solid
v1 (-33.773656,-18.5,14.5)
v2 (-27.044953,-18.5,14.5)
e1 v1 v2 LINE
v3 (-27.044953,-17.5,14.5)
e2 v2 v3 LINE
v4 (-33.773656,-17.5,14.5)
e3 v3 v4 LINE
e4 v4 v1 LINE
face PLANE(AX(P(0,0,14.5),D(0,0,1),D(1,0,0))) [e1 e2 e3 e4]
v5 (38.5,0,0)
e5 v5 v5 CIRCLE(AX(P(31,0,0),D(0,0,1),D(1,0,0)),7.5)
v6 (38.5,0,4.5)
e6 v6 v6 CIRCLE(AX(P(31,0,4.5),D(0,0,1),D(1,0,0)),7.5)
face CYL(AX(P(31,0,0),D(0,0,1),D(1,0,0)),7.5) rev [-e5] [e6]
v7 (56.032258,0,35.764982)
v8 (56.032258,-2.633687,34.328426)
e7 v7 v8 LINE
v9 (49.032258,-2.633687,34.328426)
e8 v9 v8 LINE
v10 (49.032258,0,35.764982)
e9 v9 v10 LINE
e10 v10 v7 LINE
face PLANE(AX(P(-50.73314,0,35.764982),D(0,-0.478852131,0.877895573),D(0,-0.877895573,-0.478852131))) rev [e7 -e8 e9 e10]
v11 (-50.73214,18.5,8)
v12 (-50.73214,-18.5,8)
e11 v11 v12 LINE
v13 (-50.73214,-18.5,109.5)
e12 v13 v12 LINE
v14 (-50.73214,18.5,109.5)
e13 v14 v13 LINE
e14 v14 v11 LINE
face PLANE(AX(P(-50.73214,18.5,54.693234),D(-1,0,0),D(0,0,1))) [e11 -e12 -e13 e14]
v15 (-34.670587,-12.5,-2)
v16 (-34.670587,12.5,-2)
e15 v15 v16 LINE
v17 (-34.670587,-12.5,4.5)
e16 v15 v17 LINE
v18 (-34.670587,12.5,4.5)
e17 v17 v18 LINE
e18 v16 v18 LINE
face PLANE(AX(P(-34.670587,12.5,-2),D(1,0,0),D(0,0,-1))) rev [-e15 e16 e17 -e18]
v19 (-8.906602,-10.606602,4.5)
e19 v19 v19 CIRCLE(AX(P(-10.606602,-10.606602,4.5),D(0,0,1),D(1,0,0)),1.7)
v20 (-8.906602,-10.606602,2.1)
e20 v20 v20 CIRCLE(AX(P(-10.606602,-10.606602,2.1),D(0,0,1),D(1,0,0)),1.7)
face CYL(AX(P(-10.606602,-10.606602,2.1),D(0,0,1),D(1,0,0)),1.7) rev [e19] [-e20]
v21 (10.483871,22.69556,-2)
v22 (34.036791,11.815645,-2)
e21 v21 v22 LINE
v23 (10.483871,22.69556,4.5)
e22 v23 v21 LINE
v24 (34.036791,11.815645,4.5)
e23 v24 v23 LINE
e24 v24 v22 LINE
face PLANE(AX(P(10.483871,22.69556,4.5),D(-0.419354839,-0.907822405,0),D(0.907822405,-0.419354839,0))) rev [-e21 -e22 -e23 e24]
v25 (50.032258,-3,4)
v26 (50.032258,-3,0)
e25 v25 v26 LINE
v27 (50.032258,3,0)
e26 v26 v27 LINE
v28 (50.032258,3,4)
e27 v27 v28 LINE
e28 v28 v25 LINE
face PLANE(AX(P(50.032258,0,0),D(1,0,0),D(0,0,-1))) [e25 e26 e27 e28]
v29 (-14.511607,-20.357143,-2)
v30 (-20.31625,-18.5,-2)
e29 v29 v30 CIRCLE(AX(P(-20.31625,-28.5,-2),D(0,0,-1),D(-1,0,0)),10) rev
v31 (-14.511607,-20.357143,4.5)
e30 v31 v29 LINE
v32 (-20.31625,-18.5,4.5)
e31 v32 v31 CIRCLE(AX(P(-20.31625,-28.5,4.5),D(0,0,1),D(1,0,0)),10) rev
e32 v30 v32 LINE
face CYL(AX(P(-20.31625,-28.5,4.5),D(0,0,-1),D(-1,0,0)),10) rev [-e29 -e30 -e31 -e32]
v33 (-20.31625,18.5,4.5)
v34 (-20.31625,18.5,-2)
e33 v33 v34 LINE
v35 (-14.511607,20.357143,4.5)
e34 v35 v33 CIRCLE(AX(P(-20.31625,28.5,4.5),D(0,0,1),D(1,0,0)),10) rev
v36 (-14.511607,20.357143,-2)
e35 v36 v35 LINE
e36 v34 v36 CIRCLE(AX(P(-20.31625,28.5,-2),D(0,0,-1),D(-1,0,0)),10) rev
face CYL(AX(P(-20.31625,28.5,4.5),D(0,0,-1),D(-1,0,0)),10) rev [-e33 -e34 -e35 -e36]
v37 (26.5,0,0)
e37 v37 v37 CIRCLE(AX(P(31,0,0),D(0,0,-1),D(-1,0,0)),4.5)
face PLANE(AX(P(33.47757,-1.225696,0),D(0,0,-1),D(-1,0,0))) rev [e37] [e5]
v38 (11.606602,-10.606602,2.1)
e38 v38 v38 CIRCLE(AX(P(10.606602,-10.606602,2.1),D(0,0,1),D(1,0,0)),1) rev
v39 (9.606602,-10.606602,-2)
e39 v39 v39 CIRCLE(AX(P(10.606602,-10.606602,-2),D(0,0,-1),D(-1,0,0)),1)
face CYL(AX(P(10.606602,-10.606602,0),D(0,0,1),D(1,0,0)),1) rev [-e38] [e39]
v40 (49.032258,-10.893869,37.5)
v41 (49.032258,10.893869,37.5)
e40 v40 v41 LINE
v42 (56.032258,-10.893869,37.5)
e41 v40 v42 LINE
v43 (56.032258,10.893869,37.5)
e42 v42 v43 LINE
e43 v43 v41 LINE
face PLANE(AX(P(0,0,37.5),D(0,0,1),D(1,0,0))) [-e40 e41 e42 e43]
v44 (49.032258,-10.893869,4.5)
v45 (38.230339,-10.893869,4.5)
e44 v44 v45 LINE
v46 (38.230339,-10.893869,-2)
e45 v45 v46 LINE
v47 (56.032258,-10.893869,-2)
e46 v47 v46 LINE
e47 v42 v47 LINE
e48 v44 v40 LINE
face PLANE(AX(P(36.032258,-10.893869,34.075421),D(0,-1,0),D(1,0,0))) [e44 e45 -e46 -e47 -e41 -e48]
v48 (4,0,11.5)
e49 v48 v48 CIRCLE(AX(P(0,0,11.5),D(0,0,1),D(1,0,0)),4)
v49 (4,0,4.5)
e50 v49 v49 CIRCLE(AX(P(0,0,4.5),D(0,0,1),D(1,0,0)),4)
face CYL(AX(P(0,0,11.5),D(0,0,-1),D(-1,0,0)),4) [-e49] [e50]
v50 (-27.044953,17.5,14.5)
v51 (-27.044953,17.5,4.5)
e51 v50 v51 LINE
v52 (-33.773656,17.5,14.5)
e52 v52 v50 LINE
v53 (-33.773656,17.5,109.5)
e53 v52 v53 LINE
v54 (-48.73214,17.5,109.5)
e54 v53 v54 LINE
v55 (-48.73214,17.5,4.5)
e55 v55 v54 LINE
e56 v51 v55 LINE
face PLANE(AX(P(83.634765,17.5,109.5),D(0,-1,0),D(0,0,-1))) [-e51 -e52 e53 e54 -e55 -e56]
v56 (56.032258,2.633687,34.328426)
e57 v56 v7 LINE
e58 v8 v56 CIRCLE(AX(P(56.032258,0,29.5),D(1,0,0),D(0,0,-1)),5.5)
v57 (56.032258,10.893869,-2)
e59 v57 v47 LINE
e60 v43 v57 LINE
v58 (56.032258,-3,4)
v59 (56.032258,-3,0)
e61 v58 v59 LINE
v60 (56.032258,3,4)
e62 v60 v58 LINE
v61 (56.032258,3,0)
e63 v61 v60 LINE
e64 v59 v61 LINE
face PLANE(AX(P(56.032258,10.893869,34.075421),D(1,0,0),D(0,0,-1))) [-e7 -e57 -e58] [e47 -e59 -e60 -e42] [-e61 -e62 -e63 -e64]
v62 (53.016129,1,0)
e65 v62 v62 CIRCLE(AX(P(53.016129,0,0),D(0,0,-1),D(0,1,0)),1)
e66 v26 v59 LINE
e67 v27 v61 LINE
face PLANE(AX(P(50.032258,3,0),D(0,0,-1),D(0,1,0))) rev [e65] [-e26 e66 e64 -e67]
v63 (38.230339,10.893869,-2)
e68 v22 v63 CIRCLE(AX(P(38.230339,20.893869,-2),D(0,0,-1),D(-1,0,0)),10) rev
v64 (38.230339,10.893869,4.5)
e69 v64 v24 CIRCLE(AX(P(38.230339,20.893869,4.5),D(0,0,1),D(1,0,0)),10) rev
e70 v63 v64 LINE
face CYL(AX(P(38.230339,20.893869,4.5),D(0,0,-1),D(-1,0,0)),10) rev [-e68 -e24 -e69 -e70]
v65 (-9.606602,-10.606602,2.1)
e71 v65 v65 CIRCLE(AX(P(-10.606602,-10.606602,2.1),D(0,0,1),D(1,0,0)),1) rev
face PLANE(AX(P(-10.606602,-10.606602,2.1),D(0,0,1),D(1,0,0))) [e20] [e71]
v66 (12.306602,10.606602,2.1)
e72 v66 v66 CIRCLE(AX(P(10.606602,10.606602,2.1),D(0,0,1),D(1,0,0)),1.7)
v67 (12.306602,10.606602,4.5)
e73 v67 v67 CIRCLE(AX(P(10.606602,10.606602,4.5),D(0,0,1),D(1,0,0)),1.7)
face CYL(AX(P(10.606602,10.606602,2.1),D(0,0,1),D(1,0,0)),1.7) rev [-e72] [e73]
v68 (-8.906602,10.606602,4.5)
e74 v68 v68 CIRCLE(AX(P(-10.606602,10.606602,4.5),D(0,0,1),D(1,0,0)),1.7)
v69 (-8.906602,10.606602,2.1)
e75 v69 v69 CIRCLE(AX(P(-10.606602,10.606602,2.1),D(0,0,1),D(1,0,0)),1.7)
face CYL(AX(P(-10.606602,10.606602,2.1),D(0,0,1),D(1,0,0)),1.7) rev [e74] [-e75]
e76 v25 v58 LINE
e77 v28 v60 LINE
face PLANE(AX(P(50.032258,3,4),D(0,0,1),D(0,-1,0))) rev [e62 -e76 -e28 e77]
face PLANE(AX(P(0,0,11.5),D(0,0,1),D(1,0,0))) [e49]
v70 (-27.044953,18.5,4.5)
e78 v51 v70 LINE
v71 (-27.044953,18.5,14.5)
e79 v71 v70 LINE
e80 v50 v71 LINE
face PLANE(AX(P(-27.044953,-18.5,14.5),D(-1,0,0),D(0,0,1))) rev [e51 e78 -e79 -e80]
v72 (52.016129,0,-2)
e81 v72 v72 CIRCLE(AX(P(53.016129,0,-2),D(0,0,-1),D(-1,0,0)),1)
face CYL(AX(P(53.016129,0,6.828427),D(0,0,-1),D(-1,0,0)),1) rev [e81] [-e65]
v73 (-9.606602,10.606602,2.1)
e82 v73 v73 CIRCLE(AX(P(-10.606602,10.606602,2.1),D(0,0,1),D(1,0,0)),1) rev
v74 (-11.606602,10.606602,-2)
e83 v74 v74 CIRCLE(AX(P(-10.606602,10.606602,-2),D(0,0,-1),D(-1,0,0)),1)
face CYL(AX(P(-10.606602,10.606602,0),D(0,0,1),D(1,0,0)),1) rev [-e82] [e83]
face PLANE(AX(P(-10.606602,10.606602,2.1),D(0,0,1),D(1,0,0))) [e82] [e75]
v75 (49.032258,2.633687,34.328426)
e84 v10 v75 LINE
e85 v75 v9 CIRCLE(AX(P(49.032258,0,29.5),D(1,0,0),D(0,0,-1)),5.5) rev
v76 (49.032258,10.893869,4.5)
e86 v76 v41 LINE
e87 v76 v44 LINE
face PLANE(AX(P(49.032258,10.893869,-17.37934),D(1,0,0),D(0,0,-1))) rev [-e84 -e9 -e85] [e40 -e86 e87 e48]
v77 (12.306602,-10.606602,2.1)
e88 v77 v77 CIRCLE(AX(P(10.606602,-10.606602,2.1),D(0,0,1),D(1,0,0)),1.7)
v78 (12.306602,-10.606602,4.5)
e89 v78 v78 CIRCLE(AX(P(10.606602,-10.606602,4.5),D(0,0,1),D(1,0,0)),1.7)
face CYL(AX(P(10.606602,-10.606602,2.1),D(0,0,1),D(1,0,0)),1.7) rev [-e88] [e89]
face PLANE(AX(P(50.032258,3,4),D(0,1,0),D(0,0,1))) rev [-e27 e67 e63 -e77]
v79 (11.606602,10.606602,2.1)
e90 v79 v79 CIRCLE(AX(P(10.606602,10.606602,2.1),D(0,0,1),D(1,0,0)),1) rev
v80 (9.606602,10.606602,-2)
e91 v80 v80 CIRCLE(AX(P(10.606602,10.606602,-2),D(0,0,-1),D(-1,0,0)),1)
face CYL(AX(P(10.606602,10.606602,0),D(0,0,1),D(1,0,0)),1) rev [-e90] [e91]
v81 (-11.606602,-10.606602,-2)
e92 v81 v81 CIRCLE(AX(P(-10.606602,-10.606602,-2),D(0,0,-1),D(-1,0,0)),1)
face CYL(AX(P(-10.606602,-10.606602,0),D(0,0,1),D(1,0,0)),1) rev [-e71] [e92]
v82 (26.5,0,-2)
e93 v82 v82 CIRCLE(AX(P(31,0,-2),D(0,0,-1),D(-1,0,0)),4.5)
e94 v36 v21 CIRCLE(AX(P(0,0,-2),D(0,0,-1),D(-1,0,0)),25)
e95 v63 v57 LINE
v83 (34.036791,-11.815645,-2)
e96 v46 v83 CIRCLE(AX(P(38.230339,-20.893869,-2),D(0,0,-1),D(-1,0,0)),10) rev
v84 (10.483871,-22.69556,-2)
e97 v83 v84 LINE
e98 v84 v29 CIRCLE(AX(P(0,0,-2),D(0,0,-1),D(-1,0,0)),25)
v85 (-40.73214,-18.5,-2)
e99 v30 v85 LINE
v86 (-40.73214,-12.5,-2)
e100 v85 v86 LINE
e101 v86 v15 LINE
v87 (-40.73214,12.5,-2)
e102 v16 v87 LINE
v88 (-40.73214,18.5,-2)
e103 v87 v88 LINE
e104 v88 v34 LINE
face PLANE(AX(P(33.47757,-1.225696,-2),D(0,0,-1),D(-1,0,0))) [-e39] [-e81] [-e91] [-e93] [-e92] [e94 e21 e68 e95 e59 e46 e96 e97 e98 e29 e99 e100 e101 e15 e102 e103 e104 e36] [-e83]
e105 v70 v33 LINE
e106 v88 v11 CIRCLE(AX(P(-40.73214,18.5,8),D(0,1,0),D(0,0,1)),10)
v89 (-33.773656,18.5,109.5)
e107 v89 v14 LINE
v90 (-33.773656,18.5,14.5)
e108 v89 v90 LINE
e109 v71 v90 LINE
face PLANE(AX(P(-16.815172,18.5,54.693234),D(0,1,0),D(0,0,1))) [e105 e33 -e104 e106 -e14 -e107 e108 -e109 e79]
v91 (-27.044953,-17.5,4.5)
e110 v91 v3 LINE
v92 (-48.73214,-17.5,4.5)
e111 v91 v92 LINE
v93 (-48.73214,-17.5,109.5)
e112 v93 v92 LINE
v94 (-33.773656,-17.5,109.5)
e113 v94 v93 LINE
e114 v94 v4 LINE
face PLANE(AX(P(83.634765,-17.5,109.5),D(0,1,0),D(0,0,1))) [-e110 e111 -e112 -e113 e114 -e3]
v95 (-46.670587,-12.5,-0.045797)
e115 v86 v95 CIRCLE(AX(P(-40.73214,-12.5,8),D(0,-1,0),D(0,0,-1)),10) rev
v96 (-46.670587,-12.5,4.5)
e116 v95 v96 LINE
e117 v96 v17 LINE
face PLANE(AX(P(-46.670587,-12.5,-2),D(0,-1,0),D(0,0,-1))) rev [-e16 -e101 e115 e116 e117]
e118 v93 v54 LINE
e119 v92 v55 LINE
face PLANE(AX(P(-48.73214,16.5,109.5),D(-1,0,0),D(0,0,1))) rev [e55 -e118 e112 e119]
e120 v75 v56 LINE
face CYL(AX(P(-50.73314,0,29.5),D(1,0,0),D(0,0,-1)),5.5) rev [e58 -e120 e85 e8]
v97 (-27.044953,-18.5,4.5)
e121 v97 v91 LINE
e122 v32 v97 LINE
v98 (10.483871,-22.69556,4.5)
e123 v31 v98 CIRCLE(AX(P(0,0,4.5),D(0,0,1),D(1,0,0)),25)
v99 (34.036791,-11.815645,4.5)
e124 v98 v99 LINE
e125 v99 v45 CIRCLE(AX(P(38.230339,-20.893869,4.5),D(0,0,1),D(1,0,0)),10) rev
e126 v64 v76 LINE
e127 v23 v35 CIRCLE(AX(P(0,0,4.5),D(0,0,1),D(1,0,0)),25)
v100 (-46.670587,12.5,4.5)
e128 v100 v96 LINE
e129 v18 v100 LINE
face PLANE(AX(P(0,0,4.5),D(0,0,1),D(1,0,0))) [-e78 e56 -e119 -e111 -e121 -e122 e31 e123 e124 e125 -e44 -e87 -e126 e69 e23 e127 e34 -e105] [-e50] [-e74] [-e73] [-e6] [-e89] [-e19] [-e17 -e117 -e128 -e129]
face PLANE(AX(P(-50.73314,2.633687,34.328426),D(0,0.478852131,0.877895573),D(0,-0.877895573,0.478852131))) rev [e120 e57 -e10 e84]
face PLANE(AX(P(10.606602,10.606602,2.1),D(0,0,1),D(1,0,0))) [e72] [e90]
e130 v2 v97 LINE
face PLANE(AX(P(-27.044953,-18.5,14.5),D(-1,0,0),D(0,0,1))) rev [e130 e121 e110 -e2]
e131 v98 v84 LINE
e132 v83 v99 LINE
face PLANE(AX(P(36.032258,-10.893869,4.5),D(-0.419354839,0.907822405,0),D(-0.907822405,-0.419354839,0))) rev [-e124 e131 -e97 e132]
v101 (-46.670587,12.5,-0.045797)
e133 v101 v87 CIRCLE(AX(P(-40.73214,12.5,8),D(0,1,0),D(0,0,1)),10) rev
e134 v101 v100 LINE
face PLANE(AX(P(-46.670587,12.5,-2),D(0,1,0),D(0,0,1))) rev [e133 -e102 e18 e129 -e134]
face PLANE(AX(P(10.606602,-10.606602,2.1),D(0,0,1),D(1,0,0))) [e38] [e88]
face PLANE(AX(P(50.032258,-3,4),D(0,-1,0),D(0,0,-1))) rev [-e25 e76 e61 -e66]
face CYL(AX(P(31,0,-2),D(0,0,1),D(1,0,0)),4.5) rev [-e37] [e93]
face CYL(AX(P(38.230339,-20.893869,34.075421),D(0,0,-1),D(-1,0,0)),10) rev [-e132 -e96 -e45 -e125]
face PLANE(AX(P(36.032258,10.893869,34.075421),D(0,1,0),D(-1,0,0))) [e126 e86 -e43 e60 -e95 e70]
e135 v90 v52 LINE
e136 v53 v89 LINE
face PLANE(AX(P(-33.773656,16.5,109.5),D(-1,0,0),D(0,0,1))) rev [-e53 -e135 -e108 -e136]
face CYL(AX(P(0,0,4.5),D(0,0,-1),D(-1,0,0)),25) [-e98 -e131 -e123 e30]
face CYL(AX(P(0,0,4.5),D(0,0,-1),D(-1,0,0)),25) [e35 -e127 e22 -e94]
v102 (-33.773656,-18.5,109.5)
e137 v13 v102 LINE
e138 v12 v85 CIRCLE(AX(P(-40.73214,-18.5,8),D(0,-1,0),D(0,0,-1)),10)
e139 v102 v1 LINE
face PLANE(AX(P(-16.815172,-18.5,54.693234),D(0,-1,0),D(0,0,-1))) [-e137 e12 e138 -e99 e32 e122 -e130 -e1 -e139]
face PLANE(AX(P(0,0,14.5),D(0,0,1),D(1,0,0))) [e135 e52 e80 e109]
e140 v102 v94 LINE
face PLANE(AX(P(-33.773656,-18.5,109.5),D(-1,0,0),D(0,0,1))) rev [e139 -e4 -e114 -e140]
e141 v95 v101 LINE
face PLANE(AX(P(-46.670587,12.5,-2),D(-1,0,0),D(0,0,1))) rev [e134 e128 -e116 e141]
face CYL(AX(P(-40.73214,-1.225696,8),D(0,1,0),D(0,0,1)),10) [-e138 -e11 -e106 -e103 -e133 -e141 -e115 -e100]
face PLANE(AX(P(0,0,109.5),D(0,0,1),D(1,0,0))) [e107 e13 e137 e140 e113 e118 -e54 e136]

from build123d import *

# Parameters (mm, degrees)
BOSS_EXTRUDE1_DEPTH  = 4.5
SKETCH2_R            = 7.5
CUT_EXTRUDE1_DEPTH   = 50.942466899
SKETCH3_R            = 4
BOSS_EXTRUDE2_DEPTH  = 7
BOSS_EXTRUDE3_DEPTH  = 4.5
FILLET1_R            = 10
CUT_EXTRUDE4_DEPTH   = 62.754464971
SKETCH9_R            = 1
CUT_EXTRUDE5_DEPTH   = 62.182594482
SKETCH10_R           = 1.7
CUT_EXTRUDE6_DEPTH   = 2.4
CUT_EXTRUDE7_DEPTH   = 4.5
FILLET2_R            = 10
CUT_EXTRUDE8_DEPTH   = 51.658168147
SKETCH23_R           = 1
SKETCH23_R_2         = 4.5
BOSS_EXTRUDE6_DEPTH  = 2
BOSS_EXTRUDE7_START  = -6.5
BOSS_EXTRUDE7_DEPTH  = 6.5
SKETCH26_W           = 9
SKETCH26_H           = 21.787737724
BOSS_EXTRUDE8_DEPTH  = 33
CUT_EXTRUDE9_REACH   = 94.723
SKETCH27_R           = 5
BOSS_EXTRUDE9_DEPTH  = 6.5
BOSS_EXTRUDE10_DEPTH = 105
FILLET3_R            = 10
FILLET4_R            = 10
CUT_EXTRUDE10_DEPTH  = 9
SKETCH31_W           = 12
SKETCH31_H           = 25
CUT_EXTRUDE11_DEPTH  = 122.612556686
BOSS_EXTRUDE11_DEPTH = 10
CUT_EXTRUDE12_REACH  = 141.704
SKETCH33_W           = 10
SKETCH33_H           = 33
CUT_EXTRUDE13_REACH  = 155.593
SKETCH34_W           = 105
SKETCH34_H           = 35
CUT_EXTRUDE14_REACH  = 156.964
SKETCH35_R           = 5.5
CUT_EXTRUDE15_REACH  = 156.964
SKETCH37_W           = 2
SKETCH37_H           = 21.787737724
CUT_EXTRUDE16_DEPTH  = 33
SKETCH38_W           = 4
SKETCH38_H           = 6
CUT_EXTRUDE17_DEPTH  = 6
SKETCH39_R           = 1
CUT_EXTRUDE18_DEPTH  = 6


with BuildPart() as part:
    # Sketch1 → Boss-Extrude1 (new body)
    with BuildSketch(Plane.XY):
        with BuildLine():
            Line((10.483870968, 22.695560128), (36.032258065, 10.893868862))
            ThreePointArc((36.032258065, 10.893868862), (43, 0), (36.032258065, -10.893868862))
            Line((36.032258065, -10.893868862), (10.483870968, -22.695560128))
            ThreePointArc((10.483870968, -22.695560128), (-25, 0), (10.483870968, 22.695560128))
        make_face()
    extrude(amount=BOSS_EXTRUDE1_DEPTH)

    # Sketch2 → Cut-Extrude1 (cut, through all)
    with BuildSketch(Plane.XY.offset(4.5)):
        with Locations((31, 0)):
            Circle(SKETCH2_R)
    extrude(amount=-CUT_EXTRUDE1_DEPTH, mode=Mode.SUBTRACT)

    # Sketch3 → Boss-Extrude2 (add)
    with BuildSketch(Plane.XY.offset(4.5)):
        Circle(SKETCH3_R)
    extrude(amount=BOSS_EXTRUDE2_DEPTH)

    # Sketch4 → Boss-Extrude3 (add)
    with BuildSketch(Plane(origin=(0, 0, 0), x_dir=(-1, 0, 0), z_dir=(0, 0, -1))):
        with BuildLine():
            Line((-36.032258065, 10.893868862), (-56.032258065, 10.893868862))
            Line((-56.032258065, 10.893868862), (-56.032258065, -10.893868862))
            Line((-56.032258065, -10.893868862), (-36.032258065, -10.893868862))
            ThreePointArc((-36.032258065, -10.893868862), (-43, 0), (-36.032258065, 10.893868862))
        make_face()
        with BuildLine():
            Line((22.501635968, 10.893868862), (42.501635968, 10.893868862))
            Line((42.501635968, 10.893868862), (42.501635968, -10.893868862))
            Line((42.501635968, -10.893868862), (22.501635968, -10.893868862))
            ThreePointArc((22.501635968, -10.893868862), (25, 0), (22.501635968, 10.893868862))
        make_face()
    extrude(amount=-BOSS_EXTRUDE3_DEPTH)

    # Fillet1
    fillet1_edges = [part.edges().sort_by_distance(p)[0] for p in [
        (56.032258065, 10.893868862, 2.25),
        (56.032258065, -10.893868862, 2.25),
        (-42.501635968, -10.893868862, 2.25),
        (-42.501635968, 10.893868862, 2.25),
    ]]
    fillet(fillet1_edges, radius=FILLET1_R)

    # Sketch8 → Cut-Extrude4 (cut, through all)
    with BuildSketch(Plane.XY.offset(4.5)):
        with BuildLine():
            Line((56.032258065, 0.893868862), (56.032258065, -0.893868862))
            ThreePointArc((56.032258065, -0.893868862), (55.873267798, -2.669967796), (55.401352579, -4.389590243))
            Line((55.401352579, -4.389590243), (55.401352579, 4.389590243))
            ThreePointArc((55.401352579, 4.389590243), (55.873267798, 2.669967796), (56.032258065, 0.893868862))
        make_face()
        with BuildLine():
            Line((-42.501635968, -0.893868862), (-42.501635968, 0.893868862))
            ThreePointArc((-42.501635968, 0.893868862), (-42.342645701, 2.669967796), (-41.870730482, 4.389590243))
            Line((-41.870730482, 4.389590243), (-41.870730482, -4.389590243))
            ThreePointArc((-41.870730482, -4.389590243), (-42.342645701, -2.669967796), (-42.501635968, -0.893868862))
        make_face()
    extrude(amount=-CUT_EXTRUDE4_DEPTH, mode=Mode.SUBTRACT)

    # Sketch9 → Cut-Extrude5 (cut, through all)
    with BuildSketch(Plane.XY.offset(4.5)):
        with Locations((-10.606601718, 10.606601718)):
            Circle(SKETCH9_R)
        with Locations((10.606601718, 10.606601718)):
            Circle(SKETCH9_R)
        with Locations((10.606601718, -10.606601718)):
            Circle(SKETCH9_R)
        with Locations((-10.606601718, -10.606601718)):
            Circle(SKETCH9_R)
    extrude(amount=-CUT_EXTRUDE5_DEPTH, mode=Mode.SUBTRACT)

    # Sketch10 → Cut-Extrude6 (cut)
    with BuildSketch(Plane.XY.offset(4.5)):
        with Locations((-10.606601718, 10.606601718)):
            Circle(SKETCH10_R)
        with Locations((10.606601718, 10.606601718)):
            Circle(SKETCH10_R)
        with Locations((10.606601718, -10.606601718)):
            Circle(SKETCH10_R)
        with Locations((-10.606601718, -10.606601718)):
            Circle(SKETCH10_R)
    extrude(amount=-CUT_EXTRUDE6_DEPTH, mode=Mode.SUBTRACT)

    # Sketch11 → Cut-Extrude7 (cut)
    with BuildSketch(Plane(origin=(0, 0, 0), x_dir=(-1, 0, 0), z_dir=(0, 0, -1))):
        with BuildLine():
            Line((-40.960235838, 14.646128502), (-73.67178465, 18.9155259))
            Line((-73.67178465, 18.9155259), (-68.640309048, -15.675868866))
            Line((-68.640309048, -15.675868866), (-41.444996676, -13.212200821))
            ThreePointArc((-41.444996676, -13.212200821), (-43.493415761, 0.756825882), (-40.960235838, 14.646128502))
        make_face()
    extrude(amount=-CUT_EXTRUDE7_DEPTH, mode=Mode.SUBTRACT)

    # Fillet2
    # the kernel refuses this fillet: 10 mm, written as the material it takes off along each edge
    with BuildSketch(Plane(origin=(42.113817462, -10.893868862, 28.001897109), x_dir=(0.1443560651040101, 0.9895258088941827, 0), z_dir=(0, 0, -1))) as fillet2_piece_1:
        with BuildLine():
            CenterArc((8.32021185, -9.941449502), FILLET2_R, 83.796810377, 73.10182949)
            Line((-0.877909984, -6.017859982), (-1.061872421, -5.939388192))
            ThreePointArc((-1.061872421, -5.939388192), (-0.636860154, -2.980058778), (-0.197905162, 0.028871213))
            Line((-0.197905162, 0.028871213), (-0.02161094, 0.19882899))
            ThreePointArc((-0.02161094, 0.19882899), (4.700379422, 0.454694668), (9.422369784, 0.19882899))
            Line((9.422369784, 0.19882899), (9.400758844, 0))
        make_face()
    extrude(amount=51.503794219, mode=Mode.SUBTRACT)
    with BuildSketch(Plane(origin=(42.113817462, 10.893868862, 28.001897109), x_dir=(-1, 0, 0), z_dir=(0, 0, -1))) as fillet2_piece_2:
        with BuildLine():
            CenterArc((8.636247816, -9.668172893), FILLET2_R, 104.801368002, 73.10182949)
            Line((-1.357056556, -9.302293499), (-1.556922643, -9.294975911))
            ThreePointArc((-1.556922643, -9.294975911), (-1.128460387, -4.585508816), (-0.193626747, 0.050086753))
            Line((-0.193626747, 0.050086753), (0, 0.2))
            ThreePointArc((0, 0.2), (3.040779699, 0.2), (6.030465629, 0.193363458))
            Line((6.030465629, 0.193363458), (6.081559398, 0))
        make_face()
    extrude(amount=51.503794219, mode=Mode.SUBTRACT)

    # Sketch12 → Cut-Extrude8 (cut, through all)
    with BuildSketch(Plane.XY.offset(4.5)):
        with BuildLine():
            Line((-22.501635968, 10.893868862), (-42.592674389, 14.819498464))
            Line((-42.592674389, 14.819498464), (-48.148078041, -13.612584929))
            Line((-48.148078041, -13.612584929), (-27.427309778, -14.315310761))
            Line((-27.427309778, -14.315310761), (-22.501635968, -10.893868862))
            ThreePointArc((-22.501635968, -10.893868862), (-25, 0), (-22.501635968, 10.893868862))
        make_face()
    extrude(amount=-CUT_EXTRUDE8_DEPTH, mode=Mode.SUBTRACT)

    # Sketch23 → Boss-Extrude6 (add)
    with BuildSketch(Plane(origin=(0, 0, 0), x_dir=(-1, 0, 0), z_dir=(0, 0, -1))):
        with BuildLine():
            Line((-36.032258065, -10.893868862), (-10.483870968, -22.695560128))
            ThreePointArc((-10.483870968, -22.695560128), (25, 0), (-10.483870968, 22.695560128))
            Line((-10.483870968, 22.695560128), (-36.032258065, 10.893868862))
            ThreePointArc((-36.032258065, 10.893868862), (-41.287575846, 7.470998455), (-43.470874018, 1.591575362))
            ThreePointArc((-43.470874018, 1.591575362), (-43.5, 0), (-43.470874018, -1.591575362))
            ThreePointArc((-43.470874018, -1.591575362), (-41.287575846, -7.470998455), (-36.032258065, -10.893868862))
        make_face()
        with Locations(Location((-10.606601718, -10.606601718, 0), (0, 0, 180))):
            Circle(SKETCH23_R, mode=Mode.SUBTRACT)
        with Locations(Location((10.606601718, -10.606601718, 0), (0, 0, 180))):
            Circle(SKETCH23_R, mode=Mode.SUBTRACT)
        with Locations(Location((10.606601718, 10.606601718, 0), (0, 0, 180))):
            Circle(SKETCH23_R, mode=Mode.SUBTRACT)
        with Locations(Location((-10.606601718, 10.606601718, 0), (0, 0, 180))):
            Circle(SKETCH23_R, mode=Mode.SUBTRACT)
        with Locations((-31, 0)):
            Circle(SKETCH23_R_2, mode=Mode.SUBTRACT)
    extrude(amount=BOSS_EXTRUDE6_DEPTH)

    # Sketch25 → Boss-Extrude7 (add)
    with BuildSketch(Plane(origin=(0, 0, -2), x_dir=(-1, 0, 0), z_dir=(0, 0, -1)).offset(BOSS_EXTRUDE7_START)):
        with BuildLine():
            Line((-36.032258065, 10.893868862), (-56.032258065, 10.893868862))
            Line((-56.032258065, 10.893868862), (-56.032258065, -10.893868862))
            Line((-56.032258065, -10.893868862), (-36.032258065, -10.893868862))
            ThreePointArc((-36.032258065, -10.893868862), (-41.287575846, -7.470998455), (-43.470874018, -1.591575362))
            ThreePointArc((-43.470874018, -1.591575362), (-43.5, 0), (-43.470874018, 1.591575362))
            ThreePointArc((-43.470874018, 1.591575362), (-41.287575846, 7.470998455), (-36.032258065, 10.893868862))
        make_face()
    extrude(amount=BOSS_EXTRUDE7_DEPTH)

    # Sketch26 → Boss-Extrude8 (add)
    with BuildSketch(Plane.XY.offset(4.5)):
        with Locations((51.532258065, 0)):
            Rectangle(SKETCH26_W, SKETCH26_H)
    extrude(amount=BOSS_EXTRUDE8_DEPTH)

    # Sketch27 → Cut-Extrude9 (cut, up to next)
    with BuildSketch(Plane(origin=(56.032258065, 0, 0), x_dir=(0, 0, -1), z_dir=(1, 0, 0)), mode=Mode.PRIVATE) as cut_extrude9_sk1:
        with Locations((-29.5, 0)):
            Circle(SKETCH27_R)
    cut_extrude9_tool1 = extrude(cut_extrude9_sk1.sketch, amount=-CUT_EXTRUDE9_REACH, mode=Mode.PRIVATE) & part.part
    add(cut_extrude9_tool1.solids().sort_by_distance((56.032258, 0, 29.5))[0], mode=Mode.SUBTRACT)

    # Sketch28 → Boss-Extrude9 (add)
    with BuildSketch(Plane(origin=(0, 0, -2), x_dir=(-1, 0, 0), z_dir=(0, 0, -1))):
        with BuildLine():
            Line((16.815171721, 18.5), (50.732139714, 18.5))
            Line((50.732139714, 18.5), (50.732139714, -18.5))
            Line((50.732139714, -18.5), (16.815171721, -18.5))
            ThreePointArc((16.815171721, -18.5), (25, 0), (16.815171721, 18.5))
        make_face()
    extrude(amount=-BOSS_EXTRUDE9_DEPTH)

    # Sketch29 → Boss-Extrude10 (add)
    with BuildSketch(Plane.XY.offset(4.5)):
        Polygon((-50.732139714, 18.5), (-33.773655718, 18.5), (-33.773655718, 16.5), (-48.732139714, 16.5), (-48.732139714, -16.5), (-33.773655718, -16.5), (-33.773655718, -18.5), (-50.732139714, -18.5), align=None)
    extrude(amount=BOSS_EXTRUDE10_DEPTH)

    # Fillet3
    fillet3_edges = [part.edges().sort_by_distance(p)[0] for p in [
        (-50.732139714, 0, -2),
    ]]
    fillet(fillet3_edges, radius=FILLET3_R)

    # Fillet4
    fillet4_edges = [part.edges().sort_by_distance(p)[0] for p in [
        (-16.815171721, 18.5, 1.25),
        (-16.815171721, -18.5, 1.25),
        (36.032258065, 10.893868862, 1.25),
        (36.032258065, -10.893868862, 1.25),
    ]]
    fillet(fillet4_edges, radius=FILLET4_R)

    # Sketch30 → Cut-Extrude10 (cut)
    with BuildSketch(Plane(origin=(56.032258065, 0, 0), x_dir=(0, 0, -1), z_dir=(1, 0, 0))):
        with BuildLine():
            Line((-34.192833193, 1.725490257), (-34.827272241, 0))
            Line((-34.827272241, 0), (-34.192833193, -1.725490257))
            ThreePointArc((-34.192833193, -1.725490257), (-34.5, 0), (-34.192833193, 1.725490257))
        make_face()
    extrude(amount=-CUT_EXTRUDE10_DEPTH, mode=Mode.SUBTRACT)

    # Sketch31 → Cut-Extrude11 (cut, through all)
    with BuildSketch(Plane.XY.offset(4.5)):
        with Locations((-40.670586902, 0)):
            Rectangle(SKETCH31_W, SKETCH31_H)
    extrude(amount=-CUT_EXTRUDE11_DEPTH, mode=Mode.SUBTRACT)

    # Sketch32 → Boss-Extrude11 (add)
    with BuildSketch(Plane.XY.offset(4.5)):
        Polygon((-33.773655718, 18.5), (-33.773655718, 16.5), (-27.732139714, 16.5), (-27.732139714, -16.5), (-33.773655718, -16.5), (-33.773655718, -18.5), (-27.044952686, -18.5), (-27.044952686, 18.5), align=None)
    extrude(amount=BOSS_EXTRUDE11_DEPTH)

    # Sketch33 → Cut-Extrude12 (cut, up to next)
    with BuildSketch(Plane(origin=(-27.044952686, 0, 0), x_dir=(0, 0, -1), z_dir=(1, 0, 0)), mode=Mode.PRIVATE) as cut_extrude12_sk1:
        with Locations((-9.5, 0)):
            Rectangle(SKETCH33_W, SKETCH33_H)
    cut_extrude12_tool1 = extrude(cut_extrude12_sk1.sketch, amount=-CUT_EXTRUDE12_REACH, mode=Mode.PRIVATE) & part.part
    add(cut_extrude12_tool1.solids().sort_by_distance((-27.044953, 0, 9.5))[0], mode=Mode.SUBTRACT)

    # Cut-Extrude13: up to this face of the body (flat: up to its plane)
    cut_extrude13_end = Plane(part.part.faces().sort_by_distance((-27.044952686, -17.5, 9.5))[0])
    # Sketch34 → Cut-Extrude13 (cut, up to the picked face)
    with BuildSketch(Plane(origin=(-48.732139714, 0, 0), x_dir=(0, 0, -1), z_dir=(1, 0, 0)), mode=Mode.PRIVATE) as cut_extrude13_sk1:
        with Locations((-57, 0)):
            Rectangle(SKETCH34_W, SKETCH34_H)
    cut_extrude13_tool1 = split(extrude(cut_extrude13_sk1.sketch, amount=CUT_EXTRUDE13_REACH, mode=Mode.PRIVATE), bisect_by=cut_extrude13_end, keep=Keep.BOTH, mode=Mode.PRIVATE)
    add(cut_extrude13_tool1.solids().sort_by(Axis((-48.73214, 0, 57), (1, 0, 0)))[0], mode=Mode.SUBTRACT)

    # Sketch35 → Cut-Extrude14 (cut, up to next)
    with BuildSketch(Plane(origin=(56.032258065, 0, 0), x_dir=(0, 0, -1), z_dir=(1, 0, 0)), mode=Mode.PRIVATE) as cut_extrude14_sk1:
        with Locations((-29.5, 0)):
            Circle(SKETCH35_R)
    cut_extrude14_tool1 = extrude(cut_extrude14_sk1.sketch, amount=-CUT_EXTRUDE14_REACH, mode=Mode.PRIVATE) & part.part
    add(cut_extrude14_tool1.solids().sort_by_distance((56.032258, 0, 29.5))[0], mode=Mode.SUBTRACT)

    # Sketch36 → Cut-Extrude15 (cut, up to next)
    with BuildSketch(Plane(origin=(56.032258065, 0, 0), x_dir=(0, 0, -1), z_dir=(1, 0, 0)), mode=Mode.PRIVATE) as cut_extrude15_sk1:
        with BuildLine():
            Line((-34.328425651, 2.633686719), (-35.764982043, 0))
            Line((-35.764982043, 0), (-34.328425651, -2.633686719))
            ThreePointArc((-34.328425651, -2.633686719), (-35, 0), (-34.328425651, 2.633686719))
        make_face()
    cut_extrude15_tool1 = extrude(cut_extrude15_sk1.sketch, amount=-CUT_EXTRUDE15_REACH, mode=Mode.PRIVATE) & part.part
    add(cut_extrude15_tool1.solids().sort_by_distance((56.032258, 0, 35.16481))[0], mode=Mode.SUBTRACT)

    # Sketch37 → Cut-Extrude16 (cut)
    with BuildSketch(Plane.XY.offset(37.5)):
        with Locations((48.032258065, 0)):
            Rectangle(SKETCH37_W, SKETCH37_H)
    extrude(amount=-CUT_EXTRUDE16_DEPTH, mode=Mode.SUBTRACT)

    # Sketch38 → Cut-Extrude17 (cut)
    with BuildSketch(Plane(origin=(56.032258065, 0, 0), x_dir=(0, 0, -1), z_dir=(1, 0, 0))):
        with Locations((-2, 0)):
            Rectangle(SKETCH38_W, SKETCH38_H)
    extrude(amount=-CUT_EXTRUDE17_DEPTH, mode=Mode.SUBTRACT)

    # Sketch39 → Cut-Extrude18 (cut)
    with BuildSketch(Plane(origin=(0, 0, -2), x_dir=(-1, 0, 0), z_dir=(0, 0, -1))):
        with Locations((-53.016129032, 0)):
            Circle(SKETCH39_R)
    extrude(amount=-CUT_EXTRUDE18_DEPTH, mode=Mode.SUBTRACT)


solid = part.part
